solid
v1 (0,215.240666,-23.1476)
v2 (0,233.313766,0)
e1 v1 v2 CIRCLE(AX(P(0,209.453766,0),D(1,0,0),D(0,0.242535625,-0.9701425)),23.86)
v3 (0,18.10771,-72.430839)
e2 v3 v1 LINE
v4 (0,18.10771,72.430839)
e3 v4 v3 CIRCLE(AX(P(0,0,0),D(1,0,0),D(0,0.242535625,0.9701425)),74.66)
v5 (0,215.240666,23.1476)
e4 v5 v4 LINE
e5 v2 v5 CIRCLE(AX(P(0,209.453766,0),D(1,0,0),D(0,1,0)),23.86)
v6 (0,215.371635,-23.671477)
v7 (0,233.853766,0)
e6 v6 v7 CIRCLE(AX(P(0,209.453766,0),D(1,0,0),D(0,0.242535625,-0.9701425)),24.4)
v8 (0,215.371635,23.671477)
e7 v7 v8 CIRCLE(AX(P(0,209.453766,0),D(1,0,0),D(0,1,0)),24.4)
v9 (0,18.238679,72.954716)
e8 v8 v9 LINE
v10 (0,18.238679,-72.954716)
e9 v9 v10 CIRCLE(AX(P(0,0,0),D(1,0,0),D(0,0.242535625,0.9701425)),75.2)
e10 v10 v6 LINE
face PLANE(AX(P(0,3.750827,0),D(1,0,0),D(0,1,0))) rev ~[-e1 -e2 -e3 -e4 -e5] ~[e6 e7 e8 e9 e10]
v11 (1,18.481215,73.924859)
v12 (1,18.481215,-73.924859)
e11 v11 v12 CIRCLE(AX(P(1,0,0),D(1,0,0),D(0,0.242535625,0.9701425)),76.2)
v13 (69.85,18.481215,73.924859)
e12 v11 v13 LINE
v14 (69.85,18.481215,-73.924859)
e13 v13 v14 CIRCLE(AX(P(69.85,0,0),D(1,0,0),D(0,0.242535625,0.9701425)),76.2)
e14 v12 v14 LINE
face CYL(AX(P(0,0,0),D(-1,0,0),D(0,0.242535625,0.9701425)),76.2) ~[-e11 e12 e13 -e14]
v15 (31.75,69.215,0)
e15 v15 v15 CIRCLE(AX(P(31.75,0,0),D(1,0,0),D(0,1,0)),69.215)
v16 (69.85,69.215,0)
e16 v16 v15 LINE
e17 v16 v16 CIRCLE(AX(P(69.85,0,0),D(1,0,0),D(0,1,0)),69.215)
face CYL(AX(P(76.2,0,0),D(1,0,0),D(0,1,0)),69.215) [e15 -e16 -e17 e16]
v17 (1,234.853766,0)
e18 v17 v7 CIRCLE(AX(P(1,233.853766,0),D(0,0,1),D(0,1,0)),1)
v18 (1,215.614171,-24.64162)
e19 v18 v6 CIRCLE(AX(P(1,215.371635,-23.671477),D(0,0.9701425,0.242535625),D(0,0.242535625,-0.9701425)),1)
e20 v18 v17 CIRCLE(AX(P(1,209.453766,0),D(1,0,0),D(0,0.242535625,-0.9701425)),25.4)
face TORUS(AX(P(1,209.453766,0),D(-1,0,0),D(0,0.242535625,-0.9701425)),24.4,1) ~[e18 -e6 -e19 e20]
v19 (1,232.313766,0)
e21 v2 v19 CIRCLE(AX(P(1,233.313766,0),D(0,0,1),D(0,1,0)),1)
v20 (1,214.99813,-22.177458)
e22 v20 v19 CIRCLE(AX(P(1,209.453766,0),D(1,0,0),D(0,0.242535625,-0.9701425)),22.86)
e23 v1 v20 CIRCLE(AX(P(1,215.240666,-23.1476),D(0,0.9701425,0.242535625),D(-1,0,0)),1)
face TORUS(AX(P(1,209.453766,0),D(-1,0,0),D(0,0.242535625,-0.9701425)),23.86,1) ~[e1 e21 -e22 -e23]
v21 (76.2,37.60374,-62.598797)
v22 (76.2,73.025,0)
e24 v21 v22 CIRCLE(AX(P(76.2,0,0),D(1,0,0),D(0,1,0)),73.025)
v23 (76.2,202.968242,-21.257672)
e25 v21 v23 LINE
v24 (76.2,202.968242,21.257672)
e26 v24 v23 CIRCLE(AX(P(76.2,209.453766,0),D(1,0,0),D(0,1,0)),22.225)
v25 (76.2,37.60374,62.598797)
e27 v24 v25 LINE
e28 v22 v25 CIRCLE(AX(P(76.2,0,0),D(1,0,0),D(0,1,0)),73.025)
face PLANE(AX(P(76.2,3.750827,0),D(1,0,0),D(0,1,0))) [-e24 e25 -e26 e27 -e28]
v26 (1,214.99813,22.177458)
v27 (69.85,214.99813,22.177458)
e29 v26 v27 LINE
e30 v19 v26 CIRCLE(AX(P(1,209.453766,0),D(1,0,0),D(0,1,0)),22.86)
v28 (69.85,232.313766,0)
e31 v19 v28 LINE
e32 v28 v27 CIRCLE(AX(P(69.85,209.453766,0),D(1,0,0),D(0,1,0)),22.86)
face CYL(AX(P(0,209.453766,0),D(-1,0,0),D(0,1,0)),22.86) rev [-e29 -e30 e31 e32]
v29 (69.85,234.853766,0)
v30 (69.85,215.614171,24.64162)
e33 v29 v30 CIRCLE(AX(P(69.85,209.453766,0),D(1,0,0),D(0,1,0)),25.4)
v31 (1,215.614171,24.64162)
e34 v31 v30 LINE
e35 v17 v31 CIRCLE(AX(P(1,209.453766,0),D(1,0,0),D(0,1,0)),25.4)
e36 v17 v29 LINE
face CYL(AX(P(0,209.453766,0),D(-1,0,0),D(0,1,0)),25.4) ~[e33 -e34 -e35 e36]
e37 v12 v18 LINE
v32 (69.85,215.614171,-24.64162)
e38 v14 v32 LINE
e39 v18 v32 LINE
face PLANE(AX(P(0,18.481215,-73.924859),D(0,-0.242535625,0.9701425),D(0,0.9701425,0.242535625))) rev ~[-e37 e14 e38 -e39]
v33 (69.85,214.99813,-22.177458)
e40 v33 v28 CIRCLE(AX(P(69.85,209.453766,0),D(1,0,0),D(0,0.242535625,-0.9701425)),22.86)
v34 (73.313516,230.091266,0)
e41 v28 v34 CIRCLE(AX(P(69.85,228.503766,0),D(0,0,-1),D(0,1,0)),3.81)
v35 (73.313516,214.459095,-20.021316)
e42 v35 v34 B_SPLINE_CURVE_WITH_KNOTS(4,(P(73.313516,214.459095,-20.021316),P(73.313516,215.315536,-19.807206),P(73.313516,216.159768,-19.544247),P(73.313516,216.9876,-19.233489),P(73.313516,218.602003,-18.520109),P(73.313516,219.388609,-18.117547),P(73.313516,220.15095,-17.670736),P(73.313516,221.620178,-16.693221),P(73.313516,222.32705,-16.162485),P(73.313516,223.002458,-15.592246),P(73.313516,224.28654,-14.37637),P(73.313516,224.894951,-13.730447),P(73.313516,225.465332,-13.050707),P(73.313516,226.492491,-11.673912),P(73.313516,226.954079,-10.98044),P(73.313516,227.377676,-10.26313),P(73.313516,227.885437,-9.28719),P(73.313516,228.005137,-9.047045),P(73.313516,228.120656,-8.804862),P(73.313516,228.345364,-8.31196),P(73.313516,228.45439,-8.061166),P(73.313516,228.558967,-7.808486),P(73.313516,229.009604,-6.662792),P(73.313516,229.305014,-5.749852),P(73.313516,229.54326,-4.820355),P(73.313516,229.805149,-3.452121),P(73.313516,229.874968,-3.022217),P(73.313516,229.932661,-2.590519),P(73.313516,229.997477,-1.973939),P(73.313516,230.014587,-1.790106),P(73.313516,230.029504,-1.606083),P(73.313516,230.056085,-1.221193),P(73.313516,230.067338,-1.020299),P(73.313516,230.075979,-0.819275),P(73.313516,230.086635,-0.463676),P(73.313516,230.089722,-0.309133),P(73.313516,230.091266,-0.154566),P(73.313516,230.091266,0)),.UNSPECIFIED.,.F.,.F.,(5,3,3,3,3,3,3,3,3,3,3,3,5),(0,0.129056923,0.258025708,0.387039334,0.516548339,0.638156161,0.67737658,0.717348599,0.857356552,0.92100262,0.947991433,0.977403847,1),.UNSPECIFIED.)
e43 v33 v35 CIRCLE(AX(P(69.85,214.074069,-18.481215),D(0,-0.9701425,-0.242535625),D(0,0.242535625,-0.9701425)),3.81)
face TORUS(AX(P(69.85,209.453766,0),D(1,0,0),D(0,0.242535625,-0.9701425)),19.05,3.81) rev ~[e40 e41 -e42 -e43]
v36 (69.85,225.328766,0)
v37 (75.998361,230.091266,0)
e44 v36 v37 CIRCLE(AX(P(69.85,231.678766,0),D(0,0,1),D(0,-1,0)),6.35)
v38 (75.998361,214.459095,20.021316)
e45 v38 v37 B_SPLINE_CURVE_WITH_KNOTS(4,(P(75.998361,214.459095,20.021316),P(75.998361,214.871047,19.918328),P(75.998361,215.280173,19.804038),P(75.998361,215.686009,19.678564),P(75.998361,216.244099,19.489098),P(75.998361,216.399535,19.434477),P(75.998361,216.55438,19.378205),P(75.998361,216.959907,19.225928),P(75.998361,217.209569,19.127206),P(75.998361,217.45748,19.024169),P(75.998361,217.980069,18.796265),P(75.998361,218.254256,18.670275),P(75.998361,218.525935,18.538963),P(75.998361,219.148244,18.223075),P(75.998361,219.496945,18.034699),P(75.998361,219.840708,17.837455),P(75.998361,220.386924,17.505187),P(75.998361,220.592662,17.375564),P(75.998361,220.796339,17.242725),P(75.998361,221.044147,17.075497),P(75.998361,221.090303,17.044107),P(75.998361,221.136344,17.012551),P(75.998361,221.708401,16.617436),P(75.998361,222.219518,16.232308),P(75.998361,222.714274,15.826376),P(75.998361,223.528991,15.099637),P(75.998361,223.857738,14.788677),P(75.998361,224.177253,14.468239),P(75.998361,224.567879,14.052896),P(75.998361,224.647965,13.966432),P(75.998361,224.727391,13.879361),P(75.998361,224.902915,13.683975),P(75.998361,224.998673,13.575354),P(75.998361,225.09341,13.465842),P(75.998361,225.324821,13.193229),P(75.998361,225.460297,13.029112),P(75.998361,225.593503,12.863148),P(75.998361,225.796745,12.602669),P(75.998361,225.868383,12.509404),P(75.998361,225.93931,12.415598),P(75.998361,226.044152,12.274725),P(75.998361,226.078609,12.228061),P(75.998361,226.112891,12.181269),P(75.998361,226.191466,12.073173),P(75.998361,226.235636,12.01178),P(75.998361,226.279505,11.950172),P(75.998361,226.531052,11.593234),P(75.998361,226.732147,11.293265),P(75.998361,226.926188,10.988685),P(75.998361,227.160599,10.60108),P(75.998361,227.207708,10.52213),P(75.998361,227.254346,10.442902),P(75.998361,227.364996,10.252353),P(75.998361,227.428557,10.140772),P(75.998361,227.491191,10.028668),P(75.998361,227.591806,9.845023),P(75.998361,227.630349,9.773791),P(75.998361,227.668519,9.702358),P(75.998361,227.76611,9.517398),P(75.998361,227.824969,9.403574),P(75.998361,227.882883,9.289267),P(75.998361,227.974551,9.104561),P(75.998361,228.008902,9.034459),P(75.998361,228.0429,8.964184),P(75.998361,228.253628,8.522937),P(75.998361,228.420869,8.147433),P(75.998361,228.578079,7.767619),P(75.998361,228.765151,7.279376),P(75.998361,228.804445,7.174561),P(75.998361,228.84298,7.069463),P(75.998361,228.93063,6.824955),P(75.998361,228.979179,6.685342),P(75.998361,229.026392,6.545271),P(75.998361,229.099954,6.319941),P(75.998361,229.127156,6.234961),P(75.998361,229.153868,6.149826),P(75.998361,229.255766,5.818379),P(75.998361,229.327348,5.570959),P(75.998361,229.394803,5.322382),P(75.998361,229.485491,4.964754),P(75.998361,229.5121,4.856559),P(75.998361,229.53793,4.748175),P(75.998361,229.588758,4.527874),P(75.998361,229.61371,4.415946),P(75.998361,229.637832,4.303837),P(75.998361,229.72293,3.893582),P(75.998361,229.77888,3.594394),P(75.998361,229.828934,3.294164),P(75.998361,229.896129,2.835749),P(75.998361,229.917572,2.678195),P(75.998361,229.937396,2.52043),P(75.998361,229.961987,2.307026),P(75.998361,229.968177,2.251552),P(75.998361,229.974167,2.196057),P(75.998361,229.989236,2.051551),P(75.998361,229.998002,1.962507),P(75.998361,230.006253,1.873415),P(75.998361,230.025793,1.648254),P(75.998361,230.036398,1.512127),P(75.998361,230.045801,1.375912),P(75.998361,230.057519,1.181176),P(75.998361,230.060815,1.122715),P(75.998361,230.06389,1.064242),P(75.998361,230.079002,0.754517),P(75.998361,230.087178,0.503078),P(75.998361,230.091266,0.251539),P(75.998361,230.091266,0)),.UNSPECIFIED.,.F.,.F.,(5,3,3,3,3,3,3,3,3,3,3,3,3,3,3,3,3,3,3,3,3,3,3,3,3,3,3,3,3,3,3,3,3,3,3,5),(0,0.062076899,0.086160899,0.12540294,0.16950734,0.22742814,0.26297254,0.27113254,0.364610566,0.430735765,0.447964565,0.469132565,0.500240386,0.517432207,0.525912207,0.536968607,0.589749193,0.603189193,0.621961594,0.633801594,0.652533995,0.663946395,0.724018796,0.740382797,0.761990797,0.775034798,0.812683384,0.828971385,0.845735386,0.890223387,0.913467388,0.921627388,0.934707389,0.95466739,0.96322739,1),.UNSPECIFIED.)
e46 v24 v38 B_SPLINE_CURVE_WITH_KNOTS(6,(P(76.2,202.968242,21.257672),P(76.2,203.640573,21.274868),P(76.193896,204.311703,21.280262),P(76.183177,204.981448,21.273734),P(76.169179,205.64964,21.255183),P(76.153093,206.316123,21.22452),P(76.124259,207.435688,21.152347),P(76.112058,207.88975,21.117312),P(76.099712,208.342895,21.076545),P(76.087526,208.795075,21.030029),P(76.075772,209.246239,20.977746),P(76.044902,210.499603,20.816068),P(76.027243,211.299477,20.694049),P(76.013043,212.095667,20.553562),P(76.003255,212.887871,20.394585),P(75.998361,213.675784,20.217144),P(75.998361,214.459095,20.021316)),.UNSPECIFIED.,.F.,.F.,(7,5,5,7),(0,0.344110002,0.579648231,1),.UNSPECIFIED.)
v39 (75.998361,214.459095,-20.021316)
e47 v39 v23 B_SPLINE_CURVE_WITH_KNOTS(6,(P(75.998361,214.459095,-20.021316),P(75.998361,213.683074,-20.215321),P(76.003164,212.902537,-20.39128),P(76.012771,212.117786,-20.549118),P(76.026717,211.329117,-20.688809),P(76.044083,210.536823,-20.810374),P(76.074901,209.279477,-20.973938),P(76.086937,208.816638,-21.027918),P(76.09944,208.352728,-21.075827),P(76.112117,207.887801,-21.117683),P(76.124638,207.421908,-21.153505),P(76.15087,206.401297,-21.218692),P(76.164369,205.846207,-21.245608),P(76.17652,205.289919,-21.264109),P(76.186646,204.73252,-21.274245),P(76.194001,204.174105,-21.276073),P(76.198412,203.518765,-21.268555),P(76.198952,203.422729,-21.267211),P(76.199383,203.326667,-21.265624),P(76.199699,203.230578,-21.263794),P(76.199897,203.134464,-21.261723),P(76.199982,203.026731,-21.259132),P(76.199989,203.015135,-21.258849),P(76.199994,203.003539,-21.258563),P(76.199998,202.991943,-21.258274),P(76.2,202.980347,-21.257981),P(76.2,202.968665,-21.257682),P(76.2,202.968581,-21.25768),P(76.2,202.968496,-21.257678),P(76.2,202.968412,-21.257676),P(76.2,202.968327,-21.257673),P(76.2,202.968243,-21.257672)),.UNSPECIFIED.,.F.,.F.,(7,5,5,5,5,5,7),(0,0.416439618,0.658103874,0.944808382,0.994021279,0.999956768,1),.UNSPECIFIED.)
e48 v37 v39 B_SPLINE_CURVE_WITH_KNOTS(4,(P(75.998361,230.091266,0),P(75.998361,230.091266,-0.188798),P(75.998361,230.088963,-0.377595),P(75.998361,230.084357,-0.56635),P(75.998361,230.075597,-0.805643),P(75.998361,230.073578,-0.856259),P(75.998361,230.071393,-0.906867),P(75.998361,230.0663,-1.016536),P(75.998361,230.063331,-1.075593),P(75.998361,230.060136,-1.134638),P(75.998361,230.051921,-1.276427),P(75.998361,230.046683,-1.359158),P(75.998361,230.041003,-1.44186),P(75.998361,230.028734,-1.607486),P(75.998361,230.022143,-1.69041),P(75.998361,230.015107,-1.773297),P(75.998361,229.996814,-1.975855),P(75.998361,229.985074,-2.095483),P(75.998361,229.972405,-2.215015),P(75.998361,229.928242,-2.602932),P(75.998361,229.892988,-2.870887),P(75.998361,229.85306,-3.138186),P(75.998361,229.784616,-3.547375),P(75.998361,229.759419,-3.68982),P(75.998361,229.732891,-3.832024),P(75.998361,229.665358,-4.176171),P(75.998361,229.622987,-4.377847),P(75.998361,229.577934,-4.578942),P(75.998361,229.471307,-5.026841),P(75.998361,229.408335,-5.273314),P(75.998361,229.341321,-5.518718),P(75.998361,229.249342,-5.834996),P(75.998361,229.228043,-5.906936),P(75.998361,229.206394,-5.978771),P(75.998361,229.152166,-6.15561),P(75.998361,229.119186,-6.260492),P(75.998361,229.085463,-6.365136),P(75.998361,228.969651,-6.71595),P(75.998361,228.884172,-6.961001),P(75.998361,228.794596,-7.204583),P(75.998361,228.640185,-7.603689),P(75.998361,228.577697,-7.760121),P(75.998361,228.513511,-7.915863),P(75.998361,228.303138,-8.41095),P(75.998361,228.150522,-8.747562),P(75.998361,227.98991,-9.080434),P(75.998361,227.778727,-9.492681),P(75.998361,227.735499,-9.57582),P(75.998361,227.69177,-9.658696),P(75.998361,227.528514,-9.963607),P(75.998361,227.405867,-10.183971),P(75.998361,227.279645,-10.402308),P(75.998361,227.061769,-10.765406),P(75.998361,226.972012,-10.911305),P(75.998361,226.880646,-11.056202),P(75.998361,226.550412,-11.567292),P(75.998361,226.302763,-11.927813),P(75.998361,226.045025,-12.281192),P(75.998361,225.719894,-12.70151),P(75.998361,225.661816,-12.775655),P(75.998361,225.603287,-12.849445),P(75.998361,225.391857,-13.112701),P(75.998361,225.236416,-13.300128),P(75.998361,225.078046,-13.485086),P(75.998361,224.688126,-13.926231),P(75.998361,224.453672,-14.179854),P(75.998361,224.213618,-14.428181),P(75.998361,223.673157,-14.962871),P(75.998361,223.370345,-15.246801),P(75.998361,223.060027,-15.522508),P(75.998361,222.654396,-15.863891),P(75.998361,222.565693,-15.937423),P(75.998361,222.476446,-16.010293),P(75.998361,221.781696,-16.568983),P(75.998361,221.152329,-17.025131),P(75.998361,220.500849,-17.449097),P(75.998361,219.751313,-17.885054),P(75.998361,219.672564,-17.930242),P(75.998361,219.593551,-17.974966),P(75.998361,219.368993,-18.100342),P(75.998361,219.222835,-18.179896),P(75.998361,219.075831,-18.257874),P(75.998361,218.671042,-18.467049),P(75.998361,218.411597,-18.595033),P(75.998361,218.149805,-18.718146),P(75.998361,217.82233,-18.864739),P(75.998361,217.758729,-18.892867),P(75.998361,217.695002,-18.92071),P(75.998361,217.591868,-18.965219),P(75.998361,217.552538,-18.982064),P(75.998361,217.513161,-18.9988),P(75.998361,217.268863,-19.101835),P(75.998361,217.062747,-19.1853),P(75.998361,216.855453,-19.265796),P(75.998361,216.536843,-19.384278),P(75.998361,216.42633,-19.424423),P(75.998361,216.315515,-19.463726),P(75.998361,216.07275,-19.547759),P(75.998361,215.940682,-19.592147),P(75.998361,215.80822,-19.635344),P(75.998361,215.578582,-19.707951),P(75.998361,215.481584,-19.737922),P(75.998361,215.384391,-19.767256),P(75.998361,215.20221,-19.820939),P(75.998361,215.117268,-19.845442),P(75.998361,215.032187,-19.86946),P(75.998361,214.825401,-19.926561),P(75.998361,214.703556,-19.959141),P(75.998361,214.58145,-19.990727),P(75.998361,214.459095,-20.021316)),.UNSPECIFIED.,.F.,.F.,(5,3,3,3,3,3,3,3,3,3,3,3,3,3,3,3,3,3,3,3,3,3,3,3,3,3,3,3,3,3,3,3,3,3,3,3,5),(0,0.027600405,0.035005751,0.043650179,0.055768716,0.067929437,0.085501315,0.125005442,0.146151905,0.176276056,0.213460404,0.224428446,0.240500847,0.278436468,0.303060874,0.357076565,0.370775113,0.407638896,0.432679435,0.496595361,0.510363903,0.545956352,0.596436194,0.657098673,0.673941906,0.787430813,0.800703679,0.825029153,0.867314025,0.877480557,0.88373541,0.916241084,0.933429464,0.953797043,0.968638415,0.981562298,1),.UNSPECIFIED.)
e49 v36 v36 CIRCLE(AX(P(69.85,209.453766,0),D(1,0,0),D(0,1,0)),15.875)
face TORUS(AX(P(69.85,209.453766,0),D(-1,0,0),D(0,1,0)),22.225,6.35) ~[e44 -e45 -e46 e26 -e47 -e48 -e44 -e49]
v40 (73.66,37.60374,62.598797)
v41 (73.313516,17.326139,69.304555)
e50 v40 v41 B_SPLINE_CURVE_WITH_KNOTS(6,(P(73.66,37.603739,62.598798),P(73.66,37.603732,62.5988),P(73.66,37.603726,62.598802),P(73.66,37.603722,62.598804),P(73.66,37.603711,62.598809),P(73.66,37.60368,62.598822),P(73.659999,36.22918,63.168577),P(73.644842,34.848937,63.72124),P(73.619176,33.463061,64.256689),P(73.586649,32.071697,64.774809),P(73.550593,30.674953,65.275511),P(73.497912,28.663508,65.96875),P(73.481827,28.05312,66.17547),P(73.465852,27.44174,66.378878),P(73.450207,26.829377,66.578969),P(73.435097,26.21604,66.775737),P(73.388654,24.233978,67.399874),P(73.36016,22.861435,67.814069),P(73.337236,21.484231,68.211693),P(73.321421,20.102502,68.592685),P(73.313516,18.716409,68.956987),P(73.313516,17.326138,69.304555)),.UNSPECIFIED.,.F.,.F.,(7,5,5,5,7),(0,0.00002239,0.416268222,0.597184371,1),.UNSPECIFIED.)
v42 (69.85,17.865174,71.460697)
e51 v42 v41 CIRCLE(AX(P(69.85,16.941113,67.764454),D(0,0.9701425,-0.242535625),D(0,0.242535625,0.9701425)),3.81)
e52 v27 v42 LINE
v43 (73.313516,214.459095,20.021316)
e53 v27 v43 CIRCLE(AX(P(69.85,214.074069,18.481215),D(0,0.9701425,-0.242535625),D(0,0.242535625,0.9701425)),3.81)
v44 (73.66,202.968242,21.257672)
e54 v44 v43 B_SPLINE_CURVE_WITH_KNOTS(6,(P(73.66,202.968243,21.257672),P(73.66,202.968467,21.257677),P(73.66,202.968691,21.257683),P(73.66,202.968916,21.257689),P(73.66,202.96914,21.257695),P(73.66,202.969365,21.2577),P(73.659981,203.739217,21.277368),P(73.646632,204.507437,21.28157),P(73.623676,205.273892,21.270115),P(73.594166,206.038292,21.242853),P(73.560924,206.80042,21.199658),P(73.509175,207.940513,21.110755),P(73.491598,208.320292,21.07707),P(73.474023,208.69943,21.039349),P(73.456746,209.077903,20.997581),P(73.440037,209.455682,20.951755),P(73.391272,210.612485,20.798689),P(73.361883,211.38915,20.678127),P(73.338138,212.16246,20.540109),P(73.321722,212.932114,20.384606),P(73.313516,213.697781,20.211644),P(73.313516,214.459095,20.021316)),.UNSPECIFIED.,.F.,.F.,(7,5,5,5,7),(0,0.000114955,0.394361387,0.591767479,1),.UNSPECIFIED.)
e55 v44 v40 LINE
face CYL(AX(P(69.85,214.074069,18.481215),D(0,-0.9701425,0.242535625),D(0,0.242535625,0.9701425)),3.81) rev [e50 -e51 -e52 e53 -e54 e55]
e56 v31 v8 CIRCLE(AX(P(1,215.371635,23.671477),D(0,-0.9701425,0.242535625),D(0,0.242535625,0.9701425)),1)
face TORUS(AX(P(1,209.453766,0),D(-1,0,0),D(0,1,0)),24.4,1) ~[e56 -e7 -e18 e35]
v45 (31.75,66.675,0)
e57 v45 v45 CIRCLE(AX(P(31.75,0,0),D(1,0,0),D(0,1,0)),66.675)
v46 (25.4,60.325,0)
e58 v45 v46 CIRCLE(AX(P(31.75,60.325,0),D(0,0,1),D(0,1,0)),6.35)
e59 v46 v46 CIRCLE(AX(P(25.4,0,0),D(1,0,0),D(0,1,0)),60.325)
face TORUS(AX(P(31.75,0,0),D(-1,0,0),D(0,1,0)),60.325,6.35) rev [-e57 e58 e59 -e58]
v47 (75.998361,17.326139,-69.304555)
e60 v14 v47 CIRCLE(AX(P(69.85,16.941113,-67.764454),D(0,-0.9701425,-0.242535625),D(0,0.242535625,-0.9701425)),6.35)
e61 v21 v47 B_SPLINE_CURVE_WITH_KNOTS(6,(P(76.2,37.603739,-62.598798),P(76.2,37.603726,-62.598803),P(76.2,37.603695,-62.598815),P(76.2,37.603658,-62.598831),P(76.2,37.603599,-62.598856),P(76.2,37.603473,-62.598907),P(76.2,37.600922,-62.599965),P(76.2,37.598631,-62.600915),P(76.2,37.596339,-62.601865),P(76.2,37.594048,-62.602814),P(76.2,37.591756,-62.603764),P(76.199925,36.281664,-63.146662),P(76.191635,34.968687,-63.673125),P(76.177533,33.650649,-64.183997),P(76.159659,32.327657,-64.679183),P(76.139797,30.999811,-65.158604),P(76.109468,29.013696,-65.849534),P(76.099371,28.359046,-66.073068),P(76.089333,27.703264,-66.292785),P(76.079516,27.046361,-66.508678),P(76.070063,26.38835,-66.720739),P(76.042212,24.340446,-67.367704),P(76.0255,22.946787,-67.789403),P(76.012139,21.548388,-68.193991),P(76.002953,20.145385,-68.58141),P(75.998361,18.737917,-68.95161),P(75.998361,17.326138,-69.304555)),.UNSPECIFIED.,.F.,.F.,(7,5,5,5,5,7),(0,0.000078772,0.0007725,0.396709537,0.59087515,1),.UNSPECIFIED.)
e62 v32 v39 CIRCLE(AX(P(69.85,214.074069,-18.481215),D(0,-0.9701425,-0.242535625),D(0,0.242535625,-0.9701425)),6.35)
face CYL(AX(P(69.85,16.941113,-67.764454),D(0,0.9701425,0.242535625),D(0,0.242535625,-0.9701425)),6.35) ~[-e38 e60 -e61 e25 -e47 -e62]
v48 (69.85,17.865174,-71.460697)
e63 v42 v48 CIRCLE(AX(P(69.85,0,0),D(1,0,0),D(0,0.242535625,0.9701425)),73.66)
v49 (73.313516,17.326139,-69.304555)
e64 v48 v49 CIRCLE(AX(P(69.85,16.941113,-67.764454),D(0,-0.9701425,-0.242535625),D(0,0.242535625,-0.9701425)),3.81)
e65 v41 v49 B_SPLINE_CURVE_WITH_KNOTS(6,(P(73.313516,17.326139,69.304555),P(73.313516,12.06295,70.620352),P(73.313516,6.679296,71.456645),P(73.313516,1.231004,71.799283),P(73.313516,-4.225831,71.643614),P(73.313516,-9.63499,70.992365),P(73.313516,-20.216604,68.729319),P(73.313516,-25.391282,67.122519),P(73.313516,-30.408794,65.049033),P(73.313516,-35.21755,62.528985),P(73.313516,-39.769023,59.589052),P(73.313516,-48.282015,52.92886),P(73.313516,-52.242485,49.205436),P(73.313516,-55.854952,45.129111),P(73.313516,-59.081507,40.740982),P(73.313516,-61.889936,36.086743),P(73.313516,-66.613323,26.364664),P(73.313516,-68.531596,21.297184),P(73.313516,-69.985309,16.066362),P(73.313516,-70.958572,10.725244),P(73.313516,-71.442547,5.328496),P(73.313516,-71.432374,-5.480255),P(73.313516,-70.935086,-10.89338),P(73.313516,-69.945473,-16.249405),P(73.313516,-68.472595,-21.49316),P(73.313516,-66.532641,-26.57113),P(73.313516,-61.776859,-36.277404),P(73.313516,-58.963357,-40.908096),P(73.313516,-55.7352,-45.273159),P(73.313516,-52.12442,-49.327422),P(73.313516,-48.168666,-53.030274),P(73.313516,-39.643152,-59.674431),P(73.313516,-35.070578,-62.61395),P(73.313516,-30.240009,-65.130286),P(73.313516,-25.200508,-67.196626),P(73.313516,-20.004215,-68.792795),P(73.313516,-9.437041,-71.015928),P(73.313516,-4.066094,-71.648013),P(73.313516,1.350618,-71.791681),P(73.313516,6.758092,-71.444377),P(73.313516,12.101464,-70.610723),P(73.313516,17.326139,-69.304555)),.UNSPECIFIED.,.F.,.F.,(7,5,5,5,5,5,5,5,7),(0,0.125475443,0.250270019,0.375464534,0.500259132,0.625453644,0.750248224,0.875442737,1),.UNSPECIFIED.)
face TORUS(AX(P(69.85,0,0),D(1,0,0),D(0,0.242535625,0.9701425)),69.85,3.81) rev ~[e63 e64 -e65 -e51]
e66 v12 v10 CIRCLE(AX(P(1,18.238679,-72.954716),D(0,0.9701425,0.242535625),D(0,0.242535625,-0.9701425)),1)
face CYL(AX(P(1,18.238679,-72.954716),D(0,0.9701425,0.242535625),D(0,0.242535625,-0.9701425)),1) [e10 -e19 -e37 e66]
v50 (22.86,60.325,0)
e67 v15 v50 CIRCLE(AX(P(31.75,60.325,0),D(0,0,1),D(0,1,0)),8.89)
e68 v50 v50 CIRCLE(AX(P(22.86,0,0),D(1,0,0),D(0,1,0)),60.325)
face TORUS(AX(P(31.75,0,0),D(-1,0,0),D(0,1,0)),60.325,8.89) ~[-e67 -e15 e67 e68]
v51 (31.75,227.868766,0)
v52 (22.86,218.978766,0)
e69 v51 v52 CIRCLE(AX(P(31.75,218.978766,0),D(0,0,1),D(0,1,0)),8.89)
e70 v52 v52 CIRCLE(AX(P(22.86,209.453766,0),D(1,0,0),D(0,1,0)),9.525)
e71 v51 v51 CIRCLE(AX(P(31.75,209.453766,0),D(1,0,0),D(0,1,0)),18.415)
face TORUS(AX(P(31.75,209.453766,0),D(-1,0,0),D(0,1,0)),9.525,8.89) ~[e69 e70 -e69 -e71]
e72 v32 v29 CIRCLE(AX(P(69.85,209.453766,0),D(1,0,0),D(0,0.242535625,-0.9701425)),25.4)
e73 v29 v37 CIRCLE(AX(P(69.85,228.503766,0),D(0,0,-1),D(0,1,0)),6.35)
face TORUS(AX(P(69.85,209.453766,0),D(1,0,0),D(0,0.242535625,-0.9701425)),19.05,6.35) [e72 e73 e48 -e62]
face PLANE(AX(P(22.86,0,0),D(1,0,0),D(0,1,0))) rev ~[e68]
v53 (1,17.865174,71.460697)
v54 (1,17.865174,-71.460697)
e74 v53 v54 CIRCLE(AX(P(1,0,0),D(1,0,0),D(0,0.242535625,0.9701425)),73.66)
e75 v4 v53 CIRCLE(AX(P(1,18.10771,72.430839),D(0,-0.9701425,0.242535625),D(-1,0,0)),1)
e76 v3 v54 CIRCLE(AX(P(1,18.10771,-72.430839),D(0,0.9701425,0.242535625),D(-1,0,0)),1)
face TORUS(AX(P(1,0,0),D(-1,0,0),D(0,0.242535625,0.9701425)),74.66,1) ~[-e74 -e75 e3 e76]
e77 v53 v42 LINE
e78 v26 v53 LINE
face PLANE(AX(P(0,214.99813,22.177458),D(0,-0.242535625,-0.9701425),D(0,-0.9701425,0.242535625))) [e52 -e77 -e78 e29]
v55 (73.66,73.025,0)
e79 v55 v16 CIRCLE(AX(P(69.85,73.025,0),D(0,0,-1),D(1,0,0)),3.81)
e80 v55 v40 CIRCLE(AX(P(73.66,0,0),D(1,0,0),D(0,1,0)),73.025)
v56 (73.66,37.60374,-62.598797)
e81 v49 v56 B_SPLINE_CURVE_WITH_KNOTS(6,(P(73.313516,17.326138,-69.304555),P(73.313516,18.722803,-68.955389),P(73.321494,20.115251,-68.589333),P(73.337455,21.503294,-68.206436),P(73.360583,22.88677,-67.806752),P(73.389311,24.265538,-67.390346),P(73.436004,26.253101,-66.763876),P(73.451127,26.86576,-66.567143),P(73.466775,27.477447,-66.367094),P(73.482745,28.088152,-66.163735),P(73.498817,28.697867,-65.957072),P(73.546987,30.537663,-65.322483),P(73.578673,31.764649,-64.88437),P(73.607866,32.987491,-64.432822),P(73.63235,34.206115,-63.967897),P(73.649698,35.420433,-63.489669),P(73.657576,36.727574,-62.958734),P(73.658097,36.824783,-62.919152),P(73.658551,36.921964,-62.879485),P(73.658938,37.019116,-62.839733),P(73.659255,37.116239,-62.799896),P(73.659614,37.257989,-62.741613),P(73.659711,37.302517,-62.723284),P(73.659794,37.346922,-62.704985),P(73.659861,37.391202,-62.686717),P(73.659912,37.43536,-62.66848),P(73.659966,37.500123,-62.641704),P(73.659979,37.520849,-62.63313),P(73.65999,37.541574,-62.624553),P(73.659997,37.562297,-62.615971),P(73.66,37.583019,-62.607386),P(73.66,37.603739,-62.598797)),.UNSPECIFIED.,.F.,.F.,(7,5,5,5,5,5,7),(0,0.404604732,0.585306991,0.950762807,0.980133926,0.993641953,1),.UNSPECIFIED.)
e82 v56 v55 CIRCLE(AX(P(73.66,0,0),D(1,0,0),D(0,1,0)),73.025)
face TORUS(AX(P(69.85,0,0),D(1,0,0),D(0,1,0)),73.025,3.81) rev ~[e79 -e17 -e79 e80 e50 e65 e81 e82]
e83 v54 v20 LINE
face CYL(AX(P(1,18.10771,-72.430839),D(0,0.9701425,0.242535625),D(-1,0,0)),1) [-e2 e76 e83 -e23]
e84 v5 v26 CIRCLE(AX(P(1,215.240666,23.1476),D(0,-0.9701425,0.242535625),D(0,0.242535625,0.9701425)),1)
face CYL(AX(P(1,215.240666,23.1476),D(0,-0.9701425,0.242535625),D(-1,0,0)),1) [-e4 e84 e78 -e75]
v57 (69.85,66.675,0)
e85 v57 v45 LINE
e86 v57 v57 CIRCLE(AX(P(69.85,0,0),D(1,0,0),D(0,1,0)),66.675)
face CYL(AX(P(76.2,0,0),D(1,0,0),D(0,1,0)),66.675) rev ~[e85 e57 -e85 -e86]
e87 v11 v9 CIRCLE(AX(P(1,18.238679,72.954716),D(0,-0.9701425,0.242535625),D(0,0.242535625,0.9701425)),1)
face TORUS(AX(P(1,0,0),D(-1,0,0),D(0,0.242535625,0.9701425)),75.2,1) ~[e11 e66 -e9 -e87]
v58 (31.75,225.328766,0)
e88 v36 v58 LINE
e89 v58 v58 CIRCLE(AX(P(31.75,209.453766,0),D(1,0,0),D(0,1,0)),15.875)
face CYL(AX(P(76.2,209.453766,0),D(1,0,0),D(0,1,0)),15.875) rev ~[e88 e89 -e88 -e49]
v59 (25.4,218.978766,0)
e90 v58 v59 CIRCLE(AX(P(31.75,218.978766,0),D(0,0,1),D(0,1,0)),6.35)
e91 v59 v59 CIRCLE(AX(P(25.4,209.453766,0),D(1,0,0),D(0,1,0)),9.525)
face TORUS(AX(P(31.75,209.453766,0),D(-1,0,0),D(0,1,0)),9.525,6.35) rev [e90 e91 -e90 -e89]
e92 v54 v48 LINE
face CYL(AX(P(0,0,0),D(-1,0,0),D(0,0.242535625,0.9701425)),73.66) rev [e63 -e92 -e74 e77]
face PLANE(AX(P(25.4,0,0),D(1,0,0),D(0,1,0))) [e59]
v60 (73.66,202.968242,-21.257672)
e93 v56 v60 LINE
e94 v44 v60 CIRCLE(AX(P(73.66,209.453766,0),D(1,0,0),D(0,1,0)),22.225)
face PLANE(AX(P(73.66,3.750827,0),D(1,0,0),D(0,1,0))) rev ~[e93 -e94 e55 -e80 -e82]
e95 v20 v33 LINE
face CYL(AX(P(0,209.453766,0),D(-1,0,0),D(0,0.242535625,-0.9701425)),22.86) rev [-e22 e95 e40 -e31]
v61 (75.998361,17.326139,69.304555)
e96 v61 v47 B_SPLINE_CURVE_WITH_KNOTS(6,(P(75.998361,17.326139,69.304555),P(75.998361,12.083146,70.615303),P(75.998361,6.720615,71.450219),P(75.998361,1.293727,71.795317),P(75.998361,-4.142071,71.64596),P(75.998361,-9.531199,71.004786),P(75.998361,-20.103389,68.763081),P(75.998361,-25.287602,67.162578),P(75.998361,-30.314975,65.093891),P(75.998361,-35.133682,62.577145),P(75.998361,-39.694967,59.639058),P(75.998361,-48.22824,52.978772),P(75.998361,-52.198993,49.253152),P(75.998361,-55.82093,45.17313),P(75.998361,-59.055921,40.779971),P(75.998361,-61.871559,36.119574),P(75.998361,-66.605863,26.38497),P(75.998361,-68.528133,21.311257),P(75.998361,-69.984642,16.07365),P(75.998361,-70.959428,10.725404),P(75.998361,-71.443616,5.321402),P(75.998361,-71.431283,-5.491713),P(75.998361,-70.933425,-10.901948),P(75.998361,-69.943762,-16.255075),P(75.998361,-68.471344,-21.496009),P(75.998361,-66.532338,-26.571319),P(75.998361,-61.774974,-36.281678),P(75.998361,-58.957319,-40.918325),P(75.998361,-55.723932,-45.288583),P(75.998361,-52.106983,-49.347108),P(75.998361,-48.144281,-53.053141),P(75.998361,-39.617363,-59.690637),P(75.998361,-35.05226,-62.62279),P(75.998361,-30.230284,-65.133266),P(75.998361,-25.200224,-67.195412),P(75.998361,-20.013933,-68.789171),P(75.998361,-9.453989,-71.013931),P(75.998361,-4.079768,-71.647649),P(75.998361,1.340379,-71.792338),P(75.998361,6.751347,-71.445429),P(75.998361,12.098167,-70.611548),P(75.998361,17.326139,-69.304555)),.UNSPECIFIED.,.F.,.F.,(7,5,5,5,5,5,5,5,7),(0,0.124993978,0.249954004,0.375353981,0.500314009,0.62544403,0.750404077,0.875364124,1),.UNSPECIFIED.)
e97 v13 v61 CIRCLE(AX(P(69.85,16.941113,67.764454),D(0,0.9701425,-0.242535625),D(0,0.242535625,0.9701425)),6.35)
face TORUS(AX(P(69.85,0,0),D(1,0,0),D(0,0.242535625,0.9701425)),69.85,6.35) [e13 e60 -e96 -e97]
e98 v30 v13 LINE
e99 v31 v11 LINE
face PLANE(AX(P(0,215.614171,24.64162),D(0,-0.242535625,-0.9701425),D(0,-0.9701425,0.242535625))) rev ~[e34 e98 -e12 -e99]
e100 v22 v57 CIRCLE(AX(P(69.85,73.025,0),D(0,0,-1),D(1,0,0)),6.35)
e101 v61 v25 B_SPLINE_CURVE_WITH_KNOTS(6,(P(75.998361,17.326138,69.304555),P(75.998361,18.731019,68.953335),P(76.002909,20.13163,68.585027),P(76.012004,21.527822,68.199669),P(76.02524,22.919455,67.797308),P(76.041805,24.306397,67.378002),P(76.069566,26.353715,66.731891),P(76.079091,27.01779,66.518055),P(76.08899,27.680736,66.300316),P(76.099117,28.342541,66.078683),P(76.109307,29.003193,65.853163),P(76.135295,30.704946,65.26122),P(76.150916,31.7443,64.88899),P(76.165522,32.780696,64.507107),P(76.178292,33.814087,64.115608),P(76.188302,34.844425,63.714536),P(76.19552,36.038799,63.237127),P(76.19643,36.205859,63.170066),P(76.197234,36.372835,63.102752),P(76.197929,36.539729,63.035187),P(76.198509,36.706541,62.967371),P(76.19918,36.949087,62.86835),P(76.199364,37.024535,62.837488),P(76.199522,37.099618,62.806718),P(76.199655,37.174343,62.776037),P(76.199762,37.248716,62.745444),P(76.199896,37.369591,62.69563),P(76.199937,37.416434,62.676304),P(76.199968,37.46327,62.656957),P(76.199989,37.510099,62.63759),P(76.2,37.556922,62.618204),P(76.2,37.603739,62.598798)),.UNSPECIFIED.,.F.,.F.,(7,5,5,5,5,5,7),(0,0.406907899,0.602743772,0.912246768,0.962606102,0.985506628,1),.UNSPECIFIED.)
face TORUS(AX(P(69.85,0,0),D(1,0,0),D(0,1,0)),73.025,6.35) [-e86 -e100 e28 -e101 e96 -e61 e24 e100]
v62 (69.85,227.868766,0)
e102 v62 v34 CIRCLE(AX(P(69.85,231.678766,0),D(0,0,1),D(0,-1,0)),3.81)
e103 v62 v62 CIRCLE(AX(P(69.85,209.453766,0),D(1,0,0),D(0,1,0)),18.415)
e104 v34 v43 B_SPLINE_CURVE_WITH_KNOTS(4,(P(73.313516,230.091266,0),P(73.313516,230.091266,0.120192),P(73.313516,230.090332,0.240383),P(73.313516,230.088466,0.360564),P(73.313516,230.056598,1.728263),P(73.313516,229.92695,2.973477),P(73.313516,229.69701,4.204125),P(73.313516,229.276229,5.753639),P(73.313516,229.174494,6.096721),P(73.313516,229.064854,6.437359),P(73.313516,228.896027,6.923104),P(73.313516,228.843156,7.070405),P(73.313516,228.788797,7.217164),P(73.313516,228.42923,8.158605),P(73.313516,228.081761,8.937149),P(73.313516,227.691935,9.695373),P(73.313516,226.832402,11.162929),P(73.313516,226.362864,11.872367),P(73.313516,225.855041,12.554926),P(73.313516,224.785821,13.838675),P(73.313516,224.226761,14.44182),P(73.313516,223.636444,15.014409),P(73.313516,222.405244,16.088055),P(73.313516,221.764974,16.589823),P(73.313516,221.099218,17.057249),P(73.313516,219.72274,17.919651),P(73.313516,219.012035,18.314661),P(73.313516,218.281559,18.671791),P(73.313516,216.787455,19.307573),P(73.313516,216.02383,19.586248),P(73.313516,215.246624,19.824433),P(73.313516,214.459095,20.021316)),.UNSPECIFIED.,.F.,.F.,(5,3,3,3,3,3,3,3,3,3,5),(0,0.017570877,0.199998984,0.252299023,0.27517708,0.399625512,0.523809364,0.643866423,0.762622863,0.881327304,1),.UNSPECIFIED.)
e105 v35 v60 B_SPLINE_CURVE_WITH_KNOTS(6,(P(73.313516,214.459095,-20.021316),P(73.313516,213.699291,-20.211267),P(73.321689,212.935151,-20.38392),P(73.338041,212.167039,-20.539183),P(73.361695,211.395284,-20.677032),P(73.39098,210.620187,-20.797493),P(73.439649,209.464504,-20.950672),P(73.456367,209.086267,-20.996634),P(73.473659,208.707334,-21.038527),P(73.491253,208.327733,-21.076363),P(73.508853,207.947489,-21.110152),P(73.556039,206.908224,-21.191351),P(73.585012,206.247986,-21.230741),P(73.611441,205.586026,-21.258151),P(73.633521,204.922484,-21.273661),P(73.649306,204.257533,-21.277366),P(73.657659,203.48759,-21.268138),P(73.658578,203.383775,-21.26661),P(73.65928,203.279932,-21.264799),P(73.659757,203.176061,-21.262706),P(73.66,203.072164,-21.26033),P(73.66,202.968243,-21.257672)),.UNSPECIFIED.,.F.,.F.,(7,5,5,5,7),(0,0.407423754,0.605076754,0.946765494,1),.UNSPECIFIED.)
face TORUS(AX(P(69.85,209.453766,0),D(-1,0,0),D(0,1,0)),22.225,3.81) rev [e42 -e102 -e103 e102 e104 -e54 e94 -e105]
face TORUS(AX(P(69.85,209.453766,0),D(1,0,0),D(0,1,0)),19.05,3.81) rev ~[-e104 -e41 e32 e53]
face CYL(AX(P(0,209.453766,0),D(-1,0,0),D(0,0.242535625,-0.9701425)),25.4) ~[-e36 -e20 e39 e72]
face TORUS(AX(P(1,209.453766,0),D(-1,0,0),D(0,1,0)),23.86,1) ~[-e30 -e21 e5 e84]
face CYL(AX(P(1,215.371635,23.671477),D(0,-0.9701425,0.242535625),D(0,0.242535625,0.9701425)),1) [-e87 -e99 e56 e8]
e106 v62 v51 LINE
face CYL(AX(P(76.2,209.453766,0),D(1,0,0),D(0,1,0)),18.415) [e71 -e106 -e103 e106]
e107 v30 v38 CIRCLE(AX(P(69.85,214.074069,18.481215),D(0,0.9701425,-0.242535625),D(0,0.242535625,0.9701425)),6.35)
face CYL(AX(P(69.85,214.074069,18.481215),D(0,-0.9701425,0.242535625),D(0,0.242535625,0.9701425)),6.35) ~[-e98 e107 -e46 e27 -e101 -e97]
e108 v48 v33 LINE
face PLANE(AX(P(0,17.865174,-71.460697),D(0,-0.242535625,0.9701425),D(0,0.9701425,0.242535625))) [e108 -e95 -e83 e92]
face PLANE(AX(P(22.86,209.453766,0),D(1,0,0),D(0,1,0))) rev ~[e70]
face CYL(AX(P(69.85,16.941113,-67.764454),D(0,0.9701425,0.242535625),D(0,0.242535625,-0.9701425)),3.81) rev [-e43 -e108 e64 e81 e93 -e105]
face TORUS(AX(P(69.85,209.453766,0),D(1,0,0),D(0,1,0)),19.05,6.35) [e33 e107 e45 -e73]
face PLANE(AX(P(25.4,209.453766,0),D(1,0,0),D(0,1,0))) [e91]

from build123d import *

# Parameters (mm, degrees)
F1_DEPTH = 76.2
F2_R     = 66.675
F2_R_2   = 15.875
F3_DEPTH = 50.8
F4_F1_R  = 6.35
F4_F2_R  = 6.35
F4_F3_R  = 6.35
F5_T     = -2.54
F6_R     = 1


# Not quite as in the source:
# - a fillet or chamfer that OpenCascade refuses, or shapes differently, is made with other operations: its cross-section is extruded or revolved along the edge and cut away or added


with BuildPart() as f1:
    # F0 (on Right) → F1 (new body)
    with BuildSketch(Plane.YZ):
        with BuildLine():
            ThreePointArc((18.4812146278, -73.9248585111), (60.0612543768, -46.8944103565), (76.2, 0))
            ThreePointArc((76.2, 0), (60.0612543768, 46.8944103565), (18.4812146278, 73.9248585111))
            ThreePointArc((18.4812146278, 73.9248585111), (-76.2, 0), (18.4812146278, -73.9248585111))
        make_face()
        with BuildLine():
            ThreePointArc((18.4812146278, 73.9248585111), (60.0612543768, 46.8944103565), (76.2, 0))
            ThreePointArc((76.2, 0), (60.0612543768, -46.8944103565), (18.4812146278, -73.9248585111))
            Line((18.4812146278, -73.9248585111), (215.6141706573, -24.6416195037))
            ThreePointArc((215.6141706573, -24.6416195037), (184.0537657814, 0), (215.6141706573, 24.6416195037))
            Line((215.6141706573, 24.6416195037), (18.4812146278, 73.9248585111))
        make_face()
        with BuildLine():
            ThreePointArc((234.8537657814, 0), (229.474183907, 15.6314701188), (215.6141706573, 24.6416195037))
            ThreePointArc((215.6141706573, 24.6416195037), (184.0537657814, 0), (215.6141706573, -24.6416195037))
            ThreePointArc((215.6141706573, -24.6416195037), (229.474183907, -15.6314701188), (234.8537657814, 0))
        make_face()
    extrude(amount=F1_DEPTH)

    # F2 (on face) → F3 (cut)
    with BuildSketch(Plane.YZ.offset(76.2)):
        Circle(F2_R)
        with Locations((209.4537657814, 0)):
            Circle(F2_R_2)
    extrude(amount=-F3_DEPTH, mode=Mode.SUBTRACT)

    # F4: fillet of radius 6.35 on 8 edges, made by hand

    # F4_f1
    f4_f1_edges = [f1.edges().sort_by_distance(p)[0] for p in [
        (76.2, -76.2, 0),
        (76.2, 117.0476926425, 49.2832390074),
        (76.2, 117.0476926425, -49.2832390074),
        (76.2, 234.8537657814, 0),
    ]]
    fillet(f4_f1_edges, radius=F4_F1_R)

    # F4_f2
    f4_f2_edges = [f1.edges().sort_by_distance(p)[0] for p in [
        (25.4, -66.675, 0),
    ]]
    fillet(f4_f2_edges, radius=F4_F2_R)

    # F4_f3
    f4_f3_edges = [f1.edges().sort_by_distance(p)[0] for p in [
        (25.4, 193.5787657814, 0),
    ]]
    fillet(f4_f3_edges, radius=F4_F3_R)

    # F4_s4 → F4_t5 (revolve, cut)
    with BuildSketch(Plane.XY):
        with BuildLine():
            ThreePointArc((76.2, 73.025), (74.3401280605, 68.5348719395), (69.85, 66.675))
            Line((69.85, 66.675), (69.85, 66.548))
            Line((69.85, 66.548), (76.327, 66.548))
            Line((76.327, 66.548), (76.327, 73.025))
            Line((76.327, 73.025), (76.2, 73.025))
        make_face()
    revolve(axis=Axis((76.2, 0, 0), (1, 0, 0)), mode=Mode.SUBTRACT)

    # F4_s6 → F4_t7 (revolve, cut)
    with BuildSketch(Plane.XY):
        with BuildLine():
            ThreePointArc((69.85, 225.3287657814), (74.3401280605, 227.1886377208), (76.2, 231.6787657814))
            Line((76.2, 231.6787657814), (76.327, 231.6787657814))
            Line((76.327, 231.6787657814), (76.327, 225.2017657814))
            Line((76.327, 225.2017657814), (69.85, 225.2017657814))
            Line((69.85, 225.2017657814), (69.85, 225.3287657814))
        make_face()
    revolve(axis=Axis((76.2, 209.4537657814, 0), (1, 0, 0)), mode=Mode.SUBTRACT)

    # F5
    f5_openings = [f1.faces().sort_by_distance(p)[0] for p in [
        (0, 57.51924, 0),
    ]]
    offset(amount=F5_T, openings=f5_openings)

    # F6
    f6_edges = [f1.edges().sort_by_distance(p)[0] for p in [
        (0, 117.047693, -49.283239),
        (0, 116.431652, -46.819077),
        (0, -76.2, 0),
        (0, -73.66, 0),
        (0, 116.431652, 46.819077),
        (0, 117.047693, 49.283239),
        (0, 232.313766, 0),
        (0, 234.853766, 0),
    ]]
    fillet(f6_edges, radius=F6_R)


solid = f1.part
